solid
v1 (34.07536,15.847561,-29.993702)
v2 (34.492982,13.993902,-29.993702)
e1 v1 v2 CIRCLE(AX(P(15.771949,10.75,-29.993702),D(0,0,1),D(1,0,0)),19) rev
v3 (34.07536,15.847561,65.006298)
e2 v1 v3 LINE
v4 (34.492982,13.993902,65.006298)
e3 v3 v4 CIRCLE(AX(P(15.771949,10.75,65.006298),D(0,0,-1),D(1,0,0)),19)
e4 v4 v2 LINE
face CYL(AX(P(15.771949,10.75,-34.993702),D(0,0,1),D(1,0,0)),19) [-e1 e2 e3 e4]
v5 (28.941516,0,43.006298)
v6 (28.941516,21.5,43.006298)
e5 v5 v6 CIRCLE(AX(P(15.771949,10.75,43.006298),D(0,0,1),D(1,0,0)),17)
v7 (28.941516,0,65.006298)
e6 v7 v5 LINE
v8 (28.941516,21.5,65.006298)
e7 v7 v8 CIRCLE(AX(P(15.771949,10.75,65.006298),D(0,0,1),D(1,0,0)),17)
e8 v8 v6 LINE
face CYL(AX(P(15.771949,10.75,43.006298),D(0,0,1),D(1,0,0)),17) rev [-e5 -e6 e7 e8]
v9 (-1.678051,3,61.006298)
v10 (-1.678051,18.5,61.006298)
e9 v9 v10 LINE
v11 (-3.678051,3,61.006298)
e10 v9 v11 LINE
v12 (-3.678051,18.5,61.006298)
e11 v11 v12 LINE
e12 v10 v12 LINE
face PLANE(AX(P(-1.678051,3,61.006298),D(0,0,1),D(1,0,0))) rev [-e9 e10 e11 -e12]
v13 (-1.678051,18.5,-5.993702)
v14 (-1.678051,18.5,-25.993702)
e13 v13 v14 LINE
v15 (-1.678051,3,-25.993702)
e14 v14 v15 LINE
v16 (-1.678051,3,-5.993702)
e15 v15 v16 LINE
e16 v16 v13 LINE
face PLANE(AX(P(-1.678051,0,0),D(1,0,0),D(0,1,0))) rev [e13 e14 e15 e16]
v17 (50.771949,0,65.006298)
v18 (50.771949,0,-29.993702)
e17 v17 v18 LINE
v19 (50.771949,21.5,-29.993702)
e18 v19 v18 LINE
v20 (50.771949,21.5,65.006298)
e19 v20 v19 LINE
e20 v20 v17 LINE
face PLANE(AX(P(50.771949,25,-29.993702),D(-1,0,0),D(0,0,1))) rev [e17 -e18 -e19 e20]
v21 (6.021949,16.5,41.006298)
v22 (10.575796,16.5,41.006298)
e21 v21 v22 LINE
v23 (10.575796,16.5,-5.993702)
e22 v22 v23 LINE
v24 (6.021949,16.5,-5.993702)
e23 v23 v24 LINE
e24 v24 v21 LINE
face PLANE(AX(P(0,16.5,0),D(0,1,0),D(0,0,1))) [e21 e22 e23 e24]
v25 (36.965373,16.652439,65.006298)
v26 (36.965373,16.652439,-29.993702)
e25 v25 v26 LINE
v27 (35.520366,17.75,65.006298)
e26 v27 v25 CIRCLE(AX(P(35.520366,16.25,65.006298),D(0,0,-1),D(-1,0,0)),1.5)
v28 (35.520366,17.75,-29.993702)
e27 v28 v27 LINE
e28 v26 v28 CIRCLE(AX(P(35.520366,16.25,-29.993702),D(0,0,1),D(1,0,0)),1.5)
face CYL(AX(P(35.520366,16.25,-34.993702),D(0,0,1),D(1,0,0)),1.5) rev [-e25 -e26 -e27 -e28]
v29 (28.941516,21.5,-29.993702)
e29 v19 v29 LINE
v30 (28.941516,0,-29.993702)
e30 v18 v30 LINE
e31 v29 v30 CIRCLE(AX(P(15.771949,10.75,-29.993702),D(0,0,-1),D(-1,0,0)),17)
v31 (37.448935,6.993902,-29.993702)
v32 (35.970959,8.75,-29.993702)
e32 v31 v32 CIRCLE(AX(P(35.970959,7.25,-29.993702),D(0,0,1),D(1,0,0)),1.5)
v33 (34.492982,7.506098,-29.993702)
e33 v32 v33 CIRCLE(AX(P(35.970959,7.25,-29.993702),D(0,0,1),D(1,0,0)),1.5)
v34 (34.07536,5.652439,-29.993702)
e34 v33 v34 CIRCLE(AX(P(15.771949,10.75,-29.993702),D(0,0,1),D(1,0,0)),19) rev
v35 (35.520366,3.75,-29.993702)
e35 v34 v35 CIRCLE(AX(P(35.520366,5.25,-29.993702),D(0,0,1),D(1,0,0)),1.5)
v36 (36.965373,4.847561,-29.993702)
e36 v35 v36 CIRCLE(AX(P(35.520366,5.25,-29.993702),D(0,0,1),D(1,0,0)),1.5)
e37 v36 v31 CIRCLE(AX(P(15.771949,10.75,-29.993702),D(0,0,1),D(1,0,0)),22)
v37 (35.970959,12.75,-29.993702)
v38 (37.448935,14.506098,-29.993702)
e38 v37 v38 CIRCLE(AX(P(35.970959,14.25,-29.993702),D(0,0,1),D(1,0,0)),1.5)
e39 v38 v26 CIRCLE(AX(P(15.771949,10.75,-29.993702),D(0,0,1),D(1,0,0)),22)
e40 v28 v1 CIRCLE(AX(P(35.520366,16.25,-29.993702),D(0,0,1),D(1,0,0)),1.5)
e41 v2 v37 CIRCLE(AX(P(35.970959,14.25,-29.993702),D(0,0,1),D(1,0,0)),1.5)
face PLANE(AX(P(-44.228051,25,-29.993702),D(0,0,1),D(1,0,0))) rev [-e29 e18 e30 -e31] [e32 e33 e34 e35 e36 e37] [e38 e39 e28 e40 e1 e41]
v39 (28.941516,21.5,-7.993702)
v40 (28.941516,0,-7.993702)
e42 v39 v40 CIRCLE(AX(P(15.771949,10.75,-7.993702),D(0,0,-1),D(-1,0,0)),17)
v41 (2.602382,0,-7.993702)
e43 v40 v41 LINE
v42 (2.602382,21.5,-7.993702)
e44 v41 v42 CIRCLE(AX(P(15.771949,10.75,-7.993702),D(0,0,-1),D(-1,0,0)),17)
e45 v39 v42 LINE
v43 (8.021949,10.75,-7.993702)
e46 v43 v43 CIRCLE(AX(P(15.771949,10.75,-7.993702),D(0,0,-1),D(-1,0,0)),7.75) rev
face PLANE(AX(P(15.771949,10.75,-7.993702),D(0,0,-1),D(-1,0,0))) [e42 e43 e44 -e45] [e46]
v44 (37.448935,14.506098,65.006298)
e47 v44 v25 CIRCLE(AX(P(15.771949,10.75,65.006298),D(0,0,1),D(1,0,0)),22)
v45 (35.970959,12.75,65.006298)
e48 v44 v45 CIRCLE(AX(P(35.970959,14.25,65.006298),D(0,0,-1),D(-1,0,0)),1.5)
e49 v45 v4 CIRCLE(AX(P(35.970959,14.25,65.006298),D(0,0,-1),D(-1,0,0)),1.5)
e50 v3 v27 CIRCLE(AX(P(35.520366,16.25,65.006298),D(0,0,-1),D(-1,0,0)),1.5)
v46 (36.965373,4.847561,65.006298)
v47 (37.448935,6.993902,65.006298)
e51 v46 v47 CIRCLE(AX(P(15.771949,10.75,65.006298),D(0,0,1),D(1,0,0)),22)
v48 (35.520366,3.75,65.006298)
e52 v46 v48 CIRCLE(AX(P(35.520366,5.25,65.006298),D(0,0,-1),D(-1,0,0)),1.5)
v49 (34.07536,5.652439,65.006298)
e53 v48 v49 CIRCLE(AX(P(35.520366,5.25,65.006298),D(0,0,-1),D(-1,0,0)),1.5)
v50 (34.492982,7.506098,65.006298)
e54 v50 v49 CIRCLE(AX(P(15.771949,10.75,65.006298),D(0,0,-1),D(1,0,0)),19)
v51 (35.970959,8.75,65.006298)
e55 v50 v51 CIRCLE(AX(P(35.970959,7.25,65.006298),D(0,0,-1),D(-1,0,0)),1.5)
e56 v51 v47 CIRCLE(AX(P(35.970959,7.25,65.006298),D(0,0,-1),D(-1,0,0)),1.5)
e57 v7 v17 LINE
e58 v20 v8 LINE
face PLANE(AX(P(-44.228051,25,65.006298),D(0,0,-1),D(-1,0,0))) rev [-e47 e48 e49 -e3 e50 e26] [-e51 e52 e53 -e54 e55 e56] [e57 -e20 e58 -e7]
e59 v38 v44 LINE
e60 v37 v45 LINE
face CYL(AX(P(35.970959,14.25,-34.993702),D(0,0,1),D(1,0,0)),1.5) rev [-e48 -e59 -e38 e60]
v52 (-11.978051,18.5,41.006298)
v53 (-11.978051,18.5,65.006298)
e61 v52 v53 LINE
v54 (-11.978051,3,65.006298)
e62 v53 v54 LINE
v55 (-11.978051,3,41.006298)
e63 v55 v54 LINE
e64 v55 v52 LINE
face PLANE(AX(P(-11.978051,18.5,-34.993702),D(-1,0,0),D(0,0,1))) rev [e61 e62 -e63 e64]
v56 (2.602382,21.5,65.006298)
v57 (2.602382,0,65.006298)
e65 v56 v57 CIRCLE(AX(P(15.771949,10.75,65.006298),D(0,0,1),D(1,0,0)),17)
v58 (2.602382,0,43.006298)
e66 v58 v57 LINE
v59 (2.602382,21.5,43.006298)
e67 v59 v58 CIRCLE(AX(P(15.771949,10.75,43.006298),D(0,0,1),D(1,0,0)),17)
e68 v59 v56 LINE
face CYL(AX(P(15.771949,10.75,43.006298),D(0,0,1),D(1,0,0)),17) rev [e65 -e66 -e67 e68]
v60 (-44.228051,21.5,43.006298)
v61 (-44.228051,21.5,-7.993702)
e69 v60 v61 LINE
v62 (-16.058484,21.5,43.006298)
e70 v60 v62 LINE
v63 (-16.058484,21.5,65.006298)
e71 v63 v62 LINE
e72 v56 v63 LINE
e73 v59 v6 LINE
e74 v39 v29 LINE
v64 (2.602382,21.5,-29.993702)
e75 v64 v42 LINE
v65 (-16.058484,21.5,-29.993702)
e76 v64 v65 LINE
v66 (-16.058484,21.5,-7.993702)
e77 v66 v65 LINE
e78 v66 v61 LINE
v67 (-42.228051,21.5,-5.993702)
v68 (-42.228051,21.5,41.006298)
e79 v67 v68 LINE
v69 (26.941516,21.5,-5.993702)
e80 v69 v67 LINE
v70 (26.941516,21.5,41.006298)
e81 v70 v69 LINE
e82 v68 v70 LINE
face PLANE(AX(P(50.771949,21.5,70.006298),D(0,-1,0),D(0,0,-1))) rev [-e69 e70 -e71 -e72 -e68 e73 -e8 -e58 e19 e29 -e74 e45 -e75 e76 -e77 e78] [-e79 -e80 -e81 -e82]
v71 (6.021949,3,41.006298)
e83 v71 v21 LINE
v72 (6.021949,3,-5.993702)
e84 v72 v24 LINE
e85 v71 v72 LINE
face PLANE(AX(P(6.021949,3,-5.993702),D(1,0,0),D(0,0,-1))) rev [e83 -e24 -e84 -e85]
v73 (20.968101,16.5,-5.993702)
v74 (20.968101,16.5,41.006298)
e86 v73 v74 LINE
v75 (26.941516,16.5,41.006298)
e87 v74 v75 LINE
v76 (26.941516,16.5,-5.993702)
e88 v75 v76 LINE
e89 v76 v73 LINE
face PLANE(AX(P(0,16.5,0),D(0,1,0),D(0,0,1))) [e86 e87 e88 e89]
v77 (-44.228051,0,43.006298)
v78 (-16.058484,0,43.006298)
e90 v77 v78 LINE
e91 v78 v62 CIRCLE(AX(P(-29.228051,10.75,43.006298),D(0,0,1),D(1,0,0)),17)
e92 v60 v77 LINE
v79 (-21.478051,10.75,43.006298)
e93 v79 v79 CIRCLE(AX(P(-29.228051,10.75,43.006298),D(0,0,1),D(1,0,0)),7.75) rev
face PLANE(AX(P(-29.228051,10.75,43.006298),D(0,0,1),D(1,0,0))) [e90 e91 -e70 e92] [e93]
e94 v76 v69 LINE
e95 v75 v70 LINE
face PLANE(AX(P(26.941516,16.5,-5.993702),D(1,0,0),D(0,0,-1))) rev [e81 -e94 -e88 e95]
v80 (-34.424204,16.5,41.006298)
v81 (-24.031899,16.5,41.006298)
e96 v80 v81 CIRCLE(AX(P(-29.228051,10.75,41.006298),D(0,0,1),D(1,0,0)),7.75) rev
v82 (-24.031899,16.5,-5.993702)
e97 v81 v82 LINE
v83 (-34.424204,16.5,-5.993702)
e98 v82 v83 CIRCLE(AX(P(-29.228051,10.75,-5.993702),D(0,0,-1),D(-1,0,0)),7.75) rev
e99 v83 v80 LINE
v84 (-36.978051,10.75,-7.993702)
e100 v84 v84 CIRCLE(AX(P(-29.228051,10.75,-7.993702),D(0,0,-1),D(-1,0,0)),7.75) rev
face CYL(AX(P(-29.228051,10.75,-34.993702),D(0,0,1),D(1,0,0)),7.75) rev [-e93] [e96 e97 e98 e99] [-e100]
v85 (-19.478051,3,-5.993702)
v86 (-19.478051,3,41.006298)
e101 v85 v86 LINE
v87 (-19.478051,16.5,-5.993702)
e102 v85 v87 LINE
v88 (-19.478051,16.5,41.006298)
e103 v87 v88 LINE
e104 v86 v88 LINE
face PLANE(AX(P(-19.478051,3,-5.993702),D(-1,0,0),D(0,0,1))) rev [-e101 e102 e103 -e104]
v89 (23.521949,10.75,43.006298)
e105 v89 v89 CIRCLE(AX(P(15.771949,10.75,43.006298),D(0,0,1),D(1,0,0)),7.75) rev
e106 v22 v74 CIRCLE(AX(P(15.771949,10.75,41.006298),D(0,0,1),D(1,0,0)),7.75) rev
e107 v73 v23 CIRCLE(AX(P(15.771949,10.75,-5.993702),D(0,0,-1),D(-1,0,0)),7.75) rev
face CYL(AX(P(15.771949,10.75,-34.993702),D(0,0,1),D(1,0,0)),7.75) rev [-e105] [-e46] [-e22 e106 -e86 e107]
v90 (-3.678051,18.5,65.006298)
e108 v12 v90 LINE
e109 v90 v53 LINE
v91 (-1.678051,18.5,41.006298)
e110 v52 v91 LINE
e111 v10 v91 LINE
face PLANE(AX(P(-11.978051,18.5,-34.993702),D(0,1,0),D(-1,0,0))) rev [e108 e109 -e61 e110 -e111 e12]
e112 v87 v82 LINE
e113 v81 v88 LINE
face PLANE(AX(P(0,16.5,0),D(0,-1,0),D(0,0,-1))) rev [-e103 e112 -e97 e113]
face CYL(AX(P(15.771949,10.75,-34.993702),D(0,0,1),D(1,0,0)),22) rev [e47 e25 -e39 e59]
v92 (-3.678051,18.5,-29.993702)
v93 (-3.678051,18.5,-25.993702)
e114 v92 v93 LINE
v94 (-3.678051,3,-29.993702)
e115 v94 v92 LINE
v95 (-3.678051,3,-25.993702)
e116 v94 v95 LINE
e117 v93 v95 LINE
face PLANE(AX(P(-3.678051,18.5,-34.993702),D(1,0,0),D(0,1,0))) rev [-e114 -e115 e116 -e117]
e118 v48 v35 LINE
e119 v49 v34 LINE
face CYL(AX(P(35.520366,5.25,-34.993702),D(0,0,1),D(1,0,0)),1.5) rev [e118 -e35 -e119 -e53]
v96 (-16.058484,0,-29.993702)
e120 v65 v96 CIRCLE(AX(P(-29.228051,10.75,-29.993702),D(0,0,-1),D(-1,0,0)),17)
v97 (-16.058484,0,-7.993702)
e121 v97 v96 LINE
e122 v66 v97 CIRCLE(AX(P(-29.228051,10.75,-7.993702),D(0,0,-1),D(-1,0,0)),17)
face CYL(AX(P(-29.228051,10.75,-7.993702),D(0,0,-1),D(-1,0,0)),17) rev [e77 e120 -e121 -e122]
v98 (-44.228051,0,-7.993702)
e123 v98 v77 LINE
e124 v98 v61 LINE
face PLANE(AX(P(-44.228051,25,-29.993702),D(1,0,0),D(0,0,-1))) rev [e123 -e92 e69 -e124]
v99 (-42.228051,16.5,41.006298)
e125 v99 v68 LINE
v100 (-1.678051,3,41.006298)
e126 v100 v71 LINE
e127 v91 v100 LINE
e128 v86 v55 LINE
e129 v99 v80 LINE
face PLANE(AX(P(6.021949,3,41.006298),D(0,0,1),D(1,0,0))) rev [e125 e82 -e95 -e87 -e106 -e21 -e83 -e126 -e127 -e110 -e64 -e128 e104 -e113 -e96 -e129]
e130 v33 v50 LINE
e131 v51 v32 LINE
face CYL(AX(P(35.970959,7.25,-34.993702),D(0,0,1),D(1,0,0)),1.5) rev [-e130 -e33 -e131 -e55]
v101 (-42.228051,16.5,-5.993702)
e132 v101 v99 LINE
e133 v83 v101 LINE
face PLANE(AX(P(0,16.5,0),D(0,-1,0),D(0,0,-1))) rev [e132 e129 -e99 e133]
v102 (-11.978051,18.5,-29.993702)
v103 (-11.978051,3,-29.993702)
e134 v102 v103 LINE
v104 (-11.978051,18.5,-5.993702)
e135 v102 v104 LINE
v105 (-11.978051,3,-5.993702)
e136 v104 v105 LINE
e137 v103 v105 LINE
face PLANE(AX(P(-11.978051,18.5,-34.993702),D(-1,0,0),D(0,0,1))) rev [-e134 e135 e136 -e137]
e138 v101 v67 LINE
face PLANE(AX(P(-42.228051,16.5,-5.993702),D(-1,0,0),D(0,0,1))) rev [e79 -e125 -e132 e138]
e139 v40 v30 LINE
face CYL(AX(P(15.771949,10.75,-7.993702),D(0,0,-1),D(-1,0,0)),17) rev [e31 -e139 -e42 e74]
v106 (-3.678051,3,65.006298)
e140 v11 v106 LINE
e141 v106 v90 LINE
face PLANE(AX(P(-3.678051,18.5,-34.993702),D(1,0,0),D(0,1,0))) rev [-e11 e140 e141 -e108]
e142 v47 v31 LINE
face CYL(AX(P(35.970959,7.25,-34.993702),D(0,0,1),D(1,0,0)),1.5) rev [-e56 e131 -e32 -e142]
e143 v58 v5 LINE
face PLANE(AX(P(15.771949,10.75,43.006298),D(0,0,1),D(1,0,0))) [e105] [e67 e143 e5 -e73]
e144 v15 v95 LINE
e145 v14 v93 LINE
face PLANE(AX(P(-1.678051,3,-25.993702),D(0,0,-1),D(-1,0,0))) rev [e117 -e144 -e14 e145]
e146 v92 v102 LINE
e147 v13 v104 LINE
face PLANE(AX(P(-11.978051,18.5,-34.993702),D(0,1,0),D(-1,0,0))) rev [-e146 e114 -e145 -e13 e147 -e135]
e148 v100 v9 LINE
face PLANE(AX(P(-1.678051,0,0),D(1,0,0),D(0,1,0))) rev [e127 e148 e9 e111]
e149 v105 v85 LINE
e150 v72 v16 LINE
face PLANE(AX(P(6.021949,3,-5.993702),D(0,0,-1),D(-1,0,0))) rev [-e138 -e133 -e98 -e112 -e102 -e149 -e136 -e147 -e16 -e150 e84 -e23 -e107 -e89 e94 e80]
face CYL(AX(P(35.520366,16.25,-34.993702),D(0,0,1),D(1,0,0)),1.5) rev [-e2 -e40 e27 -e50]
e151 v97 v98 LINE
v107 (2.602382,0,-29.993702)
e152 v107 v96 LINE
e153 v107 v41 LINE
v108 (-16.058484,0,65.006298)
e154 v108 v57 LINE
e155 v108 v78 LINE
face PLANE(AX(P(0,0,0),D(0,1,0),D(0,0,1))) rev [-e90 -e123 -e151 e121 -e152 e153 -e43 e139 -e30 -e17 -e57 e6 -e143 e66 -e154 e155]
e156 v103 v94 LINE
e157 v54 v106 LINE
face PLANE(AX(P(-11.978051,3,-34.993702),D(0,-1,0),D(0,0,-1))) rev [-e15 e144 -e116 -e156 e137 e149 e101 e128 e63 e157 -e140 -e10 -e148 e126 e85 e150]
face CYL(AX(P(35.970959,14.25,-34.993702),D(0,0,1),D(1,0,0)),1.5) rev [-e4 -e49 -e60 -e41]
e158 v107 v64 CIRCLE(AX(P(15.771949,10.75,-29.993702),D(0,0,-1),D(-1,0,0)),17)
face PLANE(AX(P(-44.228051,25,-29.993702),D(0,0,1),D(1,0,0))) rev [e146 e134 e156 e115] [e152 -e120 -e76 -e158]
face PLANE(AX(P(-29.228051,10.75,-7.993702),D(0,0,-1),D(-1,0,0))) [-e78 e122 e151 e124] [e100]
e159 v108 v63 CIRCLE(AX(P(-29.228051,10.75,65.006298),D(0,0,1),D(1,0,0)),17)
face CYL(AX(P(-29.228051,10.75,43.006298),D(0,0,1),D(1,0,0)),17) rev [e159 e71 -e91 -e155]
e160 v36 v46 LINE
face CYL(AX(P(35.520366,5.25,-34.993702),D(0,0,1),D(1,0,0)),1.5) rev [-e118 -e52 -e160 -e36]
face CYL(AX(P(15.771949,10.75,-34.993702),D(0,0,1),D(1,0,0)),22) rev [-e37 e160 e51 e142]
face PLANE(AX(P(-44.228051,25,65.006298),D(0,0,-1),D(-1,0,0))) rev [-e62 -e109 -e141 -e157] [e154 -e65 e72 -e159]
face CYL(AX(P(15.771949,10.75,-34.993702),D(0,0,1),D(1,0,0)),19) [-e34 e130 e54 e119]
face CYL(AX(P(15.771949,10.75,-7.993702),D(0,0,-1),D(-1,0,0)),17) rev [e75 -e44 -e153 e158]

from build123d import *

# Parameters (mm, degrees)
SKETCH1_W           = 95
SKETCH1_H           = 95
BOSS_EXTRUDE1_DEPTH = 25
SKETCH2_R           = 7.75
CUT_EXTRUDE2_DEPTH  = 100
SKETCH3_R           = 17
CUT_EXTRUDE3_DEPTH  = 22
CUT_EXTRUDE4_START  = -22
SKETCH4_R           = 17
CUT_EXTRUDE4_DEPTH  = 22
SKETCH5_W           = 6.246993927
SKETCH5_H           = 25
CUT_EXTRUDE5_DEPTH  = 22
SKETCH6_W           = 7.178723585
SKETCH6_H           = 25
CUT_EXTRUDE6_DEPTH  = 22
SKETCH8_W           = 99.503929421
SKETCH8_H           = 3.5
CUT_EXTRUDE7_DEPTH  = 100
SKETCH9_W           = 8.3
SKETCH9_H           = 15.5
CUT_EXTRUDE11_DEPTH = 100
SKETCH13_W          = 87
SKETCH13_H          = 15.5
CUT_EXTRUDE12_DEPTH = 2
SKETCH14_W          = 25.5
SKETCH14_H          = 47
CUT_EXTRUDE14_DEPTH = 18.5
SKETCH16_W          = 24.75
SKETCH16_H          = 47
CUT_EXTRUDE15_DEPTH = 5
SKETCH17_W          = 20.919567191
SKETCH17_H          = 47
CUT_EXTRUDE16_DEPTH = 5
CUT_EXTRUDE17_DEPTH = 100
FILLET6_R           = 1.5
FILLET7_R           = 1.5
FILLET8_R           = 1.5
FILLET9_R           = 1.5


with BuildPart() as part:
    # Sketch1 → Boss-Extrude1 (new body)
    with BuildSketch(Plane(origin=(0, 0, 0), x_dir=(1, 0, 0), z_dir=(0, 1, 0))):
        with Locations((3.271948822, -17.506298191)):
            Rectangle(SKETCH1_W, SKETCH1_H)
    extrude(amount=BOSS_EXTRUDE1_DEPTH)

    # Sketch2 → Cut-Extrude2 (cut)
    with BuildSketch(Plane.XY.offset(65.006298191)):
        with Locations((-29.228051178, 10.75)):
            Circle(SKETCH2_R)
        with Locations((15.771948822, 10.75)):
            Circle(SKETCH2_R)
    extrude(amount=-CUT_EXTRUDE2_DEPTH, mode=Mode.SUBTRACT)

    # Sketch3 → Cut-Extrude3 (cut)
    with BuildSketch(Plane.XY.offset(65.006298191)):
        with Locations((-29.228051178, 10.75)):
            Circle(SKETCH3_R)
        with Locations((15.771948822, 10.75)):
            Circle(SKETCH3_R)
    extrude(amount=-CUT_EXTRUDE3_DEPTH, mode=Mode.SUBTRACT)

    # Sketch4 → Cut-Extrude4 (cut)
    with BuildSketch(Plane(origin=(0, 0, -29.993701809), x_dir=(-1, 0, 0), z_dir=(0, 0, -1)).offset(CUT_EXTRUDE4_START)):
        with Locations((-15.771948822, 10.75)):
            Circle(SKETCH4_R)
        with Locations((29.228051178, 10.75)):
            Circle(SKETCH4_R)
    extrude(amount=CUT_EXTRUDE4_DEPTH, mode=Mode.SUBTRACT)

    # Sketch5 → Cut-Extrude5 (cut)
    with BuildSketch(Plane.XY.offset(65.006298191)):
        with Locations((-41.104554214, 12.5)):
            Rectangle(SKETCH5_W, SKETCH5_H)
    extrude(amount=-CUT_EXTRUDE5_DEPTH, mode=Mode.SUBTRACT)

    # Sketch6 → Cut-Extrude6 (cut)
    with BuildSketch(Plane(origin=(0, 0, -29.993701809), x_dir=(-1, 0, 0), z_dir=(0, 0, -1))):
        with Locations((40.638689386, 12.5)):
            Rectangle(SKETCH6_W, SKETCH6_H)
    extrude(amount=-CUT_EXTRUDE6_DEPTH, mode=Mode.SUBTRACT)

    # Sketch8 → Cut-Extrude7 (cut)
    with BuildSketch(Plane(origin=(0, 0, -29.993701809), x_dir=(-1, 0, 0), z_dir=(0, 0, -1))):
        with Locations((-1.019984112, 23.25)):
            Rectangle(SKETCH8_W, SKETCH8_H)
    extrude(amount=-CUT_EXTRUDE7_DEPTH, mode=Mode.SUBTRACT)

    # Sketch9 → Cut-Extrude11 (cut)
    with BuildSketch(Plane.XY.offset(65.006298191)):
        with Locations((-7.828051178, 10.75)):
            Rectangle(SKETCH9_W, SKETCH9_H)
    extrude(amount=-CUT_EXTRUDE11_DEPTH, mode=Mode.SUBTRACT)

    # Sketch13 → Cut-Extrude12 (cut)
    with BuildSketch(Plane.ZY.offset(3.678051178)):
        with Locations((17.506298191, 10.75)):
            Rectangle(SKETCH13_W, SKETCH13_H)
    extrude(amount=-CUT_EXTRUDE12_DEPTH, mode=Mode.SUBTRACT)

    # Sketch14 → Cut-Extrude14 (cut)
    with BuildSketch(Plane(origin=(0, 21.5, 0), x_dir=(1, 0, 0), z_dir=(0, 1, 0))):
        with Locations((-6.728051178, -17.506298191)):
            Rectangle(SKETCH14_W, SKETCH14_H)
    extrude(amount=-CUT_EXTRUDE14_DEPTH, mode=Mode.SUBTRACT)

    # Sketch16 → Cut-Extrude15 (cut)
    with BuildSketch(Plane(origin=(0, 21.5, 0), x_dir=(1, 0, 0), z_dir=(0, 1, 0))):
        with Locations((-29.853051178, -17.506298191)):
            Rectangle(SKETCH16_W, SKETCH16_H)
    extrude(amount=-CUT_EXTRUDE15_DEPTH, mode=Mode.SUBTRACT)

    # Sketch17 → Cut-Extrude16 (cut)
    with BuildSketch(Plane(origin=(0, 21.5, 0), x_dir=(1, 0, 0), z_dir=(0, 1, 0))):
        with Locations((16.481732418, -17.506298191)):
            Rectangle(SKETCH17_W, SKETCH17_H)
    extrude(amount=-CUT_EXTRUDE16_DEPTH, mode=Mode.SUBTRACT)

    # Sketch18 → Cut-Extrude17 (cut)
    with BuildSketch(Plane.XY.offset(65.006298191)):
        with BuildLine():
            Line((34.66639245, 12.75), (37.680851122, 12.75))
            ThreePointArc((37.680851122, 12.75), (37.300376381, 15.28065192), (36.628602437, 17.75))
            Line((36.628602437, 17.75), (33.435470555, 17.75))
            ThreePointArc((33.435470555, 17.75), (34.221100776, 15.291893017), (34.66639245, 12.75))
        make_face()
        with BuildLine():
            Line((34.66639245, 8.75), (37.680851122, 8.75))
            ThreePointArc((37.680851122, 8.75), (37.300376381, 6.21934808), (36.628602437, 3.75))
            Line((36.628602437, 3.75), (33.435470555, 3.75))
            ThreePointArc((33.435470555, 3.75), (34.221100776, 6.208106983), (34.66639245, 8.75))
        make_face()
    extrude(amount=-CUT_EXTRUDE17_DEPTH, mode=Mode.SUBTRACT)

    # Fillet6
    fillet6_edges = [part.edges().sort_by_distance(p)[0] for p in [
        (33.435470555, 17.75, 17.506298191),
        (36.628602437, 17.75, 17.506298191),
    ]]
    fillet(fillet6_edges, radius=FILLET6_R - 0.0001)  # a hair under: the kernel refuses the full size

    # Fillet7
    fillet7_edges = [part.edges().sort_by_distance(p)[0] for p in [
        (37.680851122, 12.75, 17.506298191),
        (34.66639245, 12.75, 17.506298191),
    ]]
    fillet(fillet7_edges, radius=FILLET7_R - 0.0001)  # a hair under: the kernel refuses the full size

    # Fillet8
    fillet8_edges = [part.edges().sort_by_distance(p)[0] for p in [
        (33.435470555, 3.75, 17.506298191),
        (36.628602437, 3.75, 17.506298191),
    ]]
    fillet(fillet8_edges, radius=FILLET8_R - 0.0001)  # a hair under: the kernel refuses the full size

    # Fillet9
    fillet9_edges = [part.edges().sort_by_distance(p)[0] for p in [
        (37.680851122, 8.75, 17.506298191),
        (34.66639245, 8.75, 17.506298191),
    ]]
    fillet(fillet9_edges, radius=FILLET9_R - 0.0001)  # a hair under: the kernel refuses the full size


solid = part.part
